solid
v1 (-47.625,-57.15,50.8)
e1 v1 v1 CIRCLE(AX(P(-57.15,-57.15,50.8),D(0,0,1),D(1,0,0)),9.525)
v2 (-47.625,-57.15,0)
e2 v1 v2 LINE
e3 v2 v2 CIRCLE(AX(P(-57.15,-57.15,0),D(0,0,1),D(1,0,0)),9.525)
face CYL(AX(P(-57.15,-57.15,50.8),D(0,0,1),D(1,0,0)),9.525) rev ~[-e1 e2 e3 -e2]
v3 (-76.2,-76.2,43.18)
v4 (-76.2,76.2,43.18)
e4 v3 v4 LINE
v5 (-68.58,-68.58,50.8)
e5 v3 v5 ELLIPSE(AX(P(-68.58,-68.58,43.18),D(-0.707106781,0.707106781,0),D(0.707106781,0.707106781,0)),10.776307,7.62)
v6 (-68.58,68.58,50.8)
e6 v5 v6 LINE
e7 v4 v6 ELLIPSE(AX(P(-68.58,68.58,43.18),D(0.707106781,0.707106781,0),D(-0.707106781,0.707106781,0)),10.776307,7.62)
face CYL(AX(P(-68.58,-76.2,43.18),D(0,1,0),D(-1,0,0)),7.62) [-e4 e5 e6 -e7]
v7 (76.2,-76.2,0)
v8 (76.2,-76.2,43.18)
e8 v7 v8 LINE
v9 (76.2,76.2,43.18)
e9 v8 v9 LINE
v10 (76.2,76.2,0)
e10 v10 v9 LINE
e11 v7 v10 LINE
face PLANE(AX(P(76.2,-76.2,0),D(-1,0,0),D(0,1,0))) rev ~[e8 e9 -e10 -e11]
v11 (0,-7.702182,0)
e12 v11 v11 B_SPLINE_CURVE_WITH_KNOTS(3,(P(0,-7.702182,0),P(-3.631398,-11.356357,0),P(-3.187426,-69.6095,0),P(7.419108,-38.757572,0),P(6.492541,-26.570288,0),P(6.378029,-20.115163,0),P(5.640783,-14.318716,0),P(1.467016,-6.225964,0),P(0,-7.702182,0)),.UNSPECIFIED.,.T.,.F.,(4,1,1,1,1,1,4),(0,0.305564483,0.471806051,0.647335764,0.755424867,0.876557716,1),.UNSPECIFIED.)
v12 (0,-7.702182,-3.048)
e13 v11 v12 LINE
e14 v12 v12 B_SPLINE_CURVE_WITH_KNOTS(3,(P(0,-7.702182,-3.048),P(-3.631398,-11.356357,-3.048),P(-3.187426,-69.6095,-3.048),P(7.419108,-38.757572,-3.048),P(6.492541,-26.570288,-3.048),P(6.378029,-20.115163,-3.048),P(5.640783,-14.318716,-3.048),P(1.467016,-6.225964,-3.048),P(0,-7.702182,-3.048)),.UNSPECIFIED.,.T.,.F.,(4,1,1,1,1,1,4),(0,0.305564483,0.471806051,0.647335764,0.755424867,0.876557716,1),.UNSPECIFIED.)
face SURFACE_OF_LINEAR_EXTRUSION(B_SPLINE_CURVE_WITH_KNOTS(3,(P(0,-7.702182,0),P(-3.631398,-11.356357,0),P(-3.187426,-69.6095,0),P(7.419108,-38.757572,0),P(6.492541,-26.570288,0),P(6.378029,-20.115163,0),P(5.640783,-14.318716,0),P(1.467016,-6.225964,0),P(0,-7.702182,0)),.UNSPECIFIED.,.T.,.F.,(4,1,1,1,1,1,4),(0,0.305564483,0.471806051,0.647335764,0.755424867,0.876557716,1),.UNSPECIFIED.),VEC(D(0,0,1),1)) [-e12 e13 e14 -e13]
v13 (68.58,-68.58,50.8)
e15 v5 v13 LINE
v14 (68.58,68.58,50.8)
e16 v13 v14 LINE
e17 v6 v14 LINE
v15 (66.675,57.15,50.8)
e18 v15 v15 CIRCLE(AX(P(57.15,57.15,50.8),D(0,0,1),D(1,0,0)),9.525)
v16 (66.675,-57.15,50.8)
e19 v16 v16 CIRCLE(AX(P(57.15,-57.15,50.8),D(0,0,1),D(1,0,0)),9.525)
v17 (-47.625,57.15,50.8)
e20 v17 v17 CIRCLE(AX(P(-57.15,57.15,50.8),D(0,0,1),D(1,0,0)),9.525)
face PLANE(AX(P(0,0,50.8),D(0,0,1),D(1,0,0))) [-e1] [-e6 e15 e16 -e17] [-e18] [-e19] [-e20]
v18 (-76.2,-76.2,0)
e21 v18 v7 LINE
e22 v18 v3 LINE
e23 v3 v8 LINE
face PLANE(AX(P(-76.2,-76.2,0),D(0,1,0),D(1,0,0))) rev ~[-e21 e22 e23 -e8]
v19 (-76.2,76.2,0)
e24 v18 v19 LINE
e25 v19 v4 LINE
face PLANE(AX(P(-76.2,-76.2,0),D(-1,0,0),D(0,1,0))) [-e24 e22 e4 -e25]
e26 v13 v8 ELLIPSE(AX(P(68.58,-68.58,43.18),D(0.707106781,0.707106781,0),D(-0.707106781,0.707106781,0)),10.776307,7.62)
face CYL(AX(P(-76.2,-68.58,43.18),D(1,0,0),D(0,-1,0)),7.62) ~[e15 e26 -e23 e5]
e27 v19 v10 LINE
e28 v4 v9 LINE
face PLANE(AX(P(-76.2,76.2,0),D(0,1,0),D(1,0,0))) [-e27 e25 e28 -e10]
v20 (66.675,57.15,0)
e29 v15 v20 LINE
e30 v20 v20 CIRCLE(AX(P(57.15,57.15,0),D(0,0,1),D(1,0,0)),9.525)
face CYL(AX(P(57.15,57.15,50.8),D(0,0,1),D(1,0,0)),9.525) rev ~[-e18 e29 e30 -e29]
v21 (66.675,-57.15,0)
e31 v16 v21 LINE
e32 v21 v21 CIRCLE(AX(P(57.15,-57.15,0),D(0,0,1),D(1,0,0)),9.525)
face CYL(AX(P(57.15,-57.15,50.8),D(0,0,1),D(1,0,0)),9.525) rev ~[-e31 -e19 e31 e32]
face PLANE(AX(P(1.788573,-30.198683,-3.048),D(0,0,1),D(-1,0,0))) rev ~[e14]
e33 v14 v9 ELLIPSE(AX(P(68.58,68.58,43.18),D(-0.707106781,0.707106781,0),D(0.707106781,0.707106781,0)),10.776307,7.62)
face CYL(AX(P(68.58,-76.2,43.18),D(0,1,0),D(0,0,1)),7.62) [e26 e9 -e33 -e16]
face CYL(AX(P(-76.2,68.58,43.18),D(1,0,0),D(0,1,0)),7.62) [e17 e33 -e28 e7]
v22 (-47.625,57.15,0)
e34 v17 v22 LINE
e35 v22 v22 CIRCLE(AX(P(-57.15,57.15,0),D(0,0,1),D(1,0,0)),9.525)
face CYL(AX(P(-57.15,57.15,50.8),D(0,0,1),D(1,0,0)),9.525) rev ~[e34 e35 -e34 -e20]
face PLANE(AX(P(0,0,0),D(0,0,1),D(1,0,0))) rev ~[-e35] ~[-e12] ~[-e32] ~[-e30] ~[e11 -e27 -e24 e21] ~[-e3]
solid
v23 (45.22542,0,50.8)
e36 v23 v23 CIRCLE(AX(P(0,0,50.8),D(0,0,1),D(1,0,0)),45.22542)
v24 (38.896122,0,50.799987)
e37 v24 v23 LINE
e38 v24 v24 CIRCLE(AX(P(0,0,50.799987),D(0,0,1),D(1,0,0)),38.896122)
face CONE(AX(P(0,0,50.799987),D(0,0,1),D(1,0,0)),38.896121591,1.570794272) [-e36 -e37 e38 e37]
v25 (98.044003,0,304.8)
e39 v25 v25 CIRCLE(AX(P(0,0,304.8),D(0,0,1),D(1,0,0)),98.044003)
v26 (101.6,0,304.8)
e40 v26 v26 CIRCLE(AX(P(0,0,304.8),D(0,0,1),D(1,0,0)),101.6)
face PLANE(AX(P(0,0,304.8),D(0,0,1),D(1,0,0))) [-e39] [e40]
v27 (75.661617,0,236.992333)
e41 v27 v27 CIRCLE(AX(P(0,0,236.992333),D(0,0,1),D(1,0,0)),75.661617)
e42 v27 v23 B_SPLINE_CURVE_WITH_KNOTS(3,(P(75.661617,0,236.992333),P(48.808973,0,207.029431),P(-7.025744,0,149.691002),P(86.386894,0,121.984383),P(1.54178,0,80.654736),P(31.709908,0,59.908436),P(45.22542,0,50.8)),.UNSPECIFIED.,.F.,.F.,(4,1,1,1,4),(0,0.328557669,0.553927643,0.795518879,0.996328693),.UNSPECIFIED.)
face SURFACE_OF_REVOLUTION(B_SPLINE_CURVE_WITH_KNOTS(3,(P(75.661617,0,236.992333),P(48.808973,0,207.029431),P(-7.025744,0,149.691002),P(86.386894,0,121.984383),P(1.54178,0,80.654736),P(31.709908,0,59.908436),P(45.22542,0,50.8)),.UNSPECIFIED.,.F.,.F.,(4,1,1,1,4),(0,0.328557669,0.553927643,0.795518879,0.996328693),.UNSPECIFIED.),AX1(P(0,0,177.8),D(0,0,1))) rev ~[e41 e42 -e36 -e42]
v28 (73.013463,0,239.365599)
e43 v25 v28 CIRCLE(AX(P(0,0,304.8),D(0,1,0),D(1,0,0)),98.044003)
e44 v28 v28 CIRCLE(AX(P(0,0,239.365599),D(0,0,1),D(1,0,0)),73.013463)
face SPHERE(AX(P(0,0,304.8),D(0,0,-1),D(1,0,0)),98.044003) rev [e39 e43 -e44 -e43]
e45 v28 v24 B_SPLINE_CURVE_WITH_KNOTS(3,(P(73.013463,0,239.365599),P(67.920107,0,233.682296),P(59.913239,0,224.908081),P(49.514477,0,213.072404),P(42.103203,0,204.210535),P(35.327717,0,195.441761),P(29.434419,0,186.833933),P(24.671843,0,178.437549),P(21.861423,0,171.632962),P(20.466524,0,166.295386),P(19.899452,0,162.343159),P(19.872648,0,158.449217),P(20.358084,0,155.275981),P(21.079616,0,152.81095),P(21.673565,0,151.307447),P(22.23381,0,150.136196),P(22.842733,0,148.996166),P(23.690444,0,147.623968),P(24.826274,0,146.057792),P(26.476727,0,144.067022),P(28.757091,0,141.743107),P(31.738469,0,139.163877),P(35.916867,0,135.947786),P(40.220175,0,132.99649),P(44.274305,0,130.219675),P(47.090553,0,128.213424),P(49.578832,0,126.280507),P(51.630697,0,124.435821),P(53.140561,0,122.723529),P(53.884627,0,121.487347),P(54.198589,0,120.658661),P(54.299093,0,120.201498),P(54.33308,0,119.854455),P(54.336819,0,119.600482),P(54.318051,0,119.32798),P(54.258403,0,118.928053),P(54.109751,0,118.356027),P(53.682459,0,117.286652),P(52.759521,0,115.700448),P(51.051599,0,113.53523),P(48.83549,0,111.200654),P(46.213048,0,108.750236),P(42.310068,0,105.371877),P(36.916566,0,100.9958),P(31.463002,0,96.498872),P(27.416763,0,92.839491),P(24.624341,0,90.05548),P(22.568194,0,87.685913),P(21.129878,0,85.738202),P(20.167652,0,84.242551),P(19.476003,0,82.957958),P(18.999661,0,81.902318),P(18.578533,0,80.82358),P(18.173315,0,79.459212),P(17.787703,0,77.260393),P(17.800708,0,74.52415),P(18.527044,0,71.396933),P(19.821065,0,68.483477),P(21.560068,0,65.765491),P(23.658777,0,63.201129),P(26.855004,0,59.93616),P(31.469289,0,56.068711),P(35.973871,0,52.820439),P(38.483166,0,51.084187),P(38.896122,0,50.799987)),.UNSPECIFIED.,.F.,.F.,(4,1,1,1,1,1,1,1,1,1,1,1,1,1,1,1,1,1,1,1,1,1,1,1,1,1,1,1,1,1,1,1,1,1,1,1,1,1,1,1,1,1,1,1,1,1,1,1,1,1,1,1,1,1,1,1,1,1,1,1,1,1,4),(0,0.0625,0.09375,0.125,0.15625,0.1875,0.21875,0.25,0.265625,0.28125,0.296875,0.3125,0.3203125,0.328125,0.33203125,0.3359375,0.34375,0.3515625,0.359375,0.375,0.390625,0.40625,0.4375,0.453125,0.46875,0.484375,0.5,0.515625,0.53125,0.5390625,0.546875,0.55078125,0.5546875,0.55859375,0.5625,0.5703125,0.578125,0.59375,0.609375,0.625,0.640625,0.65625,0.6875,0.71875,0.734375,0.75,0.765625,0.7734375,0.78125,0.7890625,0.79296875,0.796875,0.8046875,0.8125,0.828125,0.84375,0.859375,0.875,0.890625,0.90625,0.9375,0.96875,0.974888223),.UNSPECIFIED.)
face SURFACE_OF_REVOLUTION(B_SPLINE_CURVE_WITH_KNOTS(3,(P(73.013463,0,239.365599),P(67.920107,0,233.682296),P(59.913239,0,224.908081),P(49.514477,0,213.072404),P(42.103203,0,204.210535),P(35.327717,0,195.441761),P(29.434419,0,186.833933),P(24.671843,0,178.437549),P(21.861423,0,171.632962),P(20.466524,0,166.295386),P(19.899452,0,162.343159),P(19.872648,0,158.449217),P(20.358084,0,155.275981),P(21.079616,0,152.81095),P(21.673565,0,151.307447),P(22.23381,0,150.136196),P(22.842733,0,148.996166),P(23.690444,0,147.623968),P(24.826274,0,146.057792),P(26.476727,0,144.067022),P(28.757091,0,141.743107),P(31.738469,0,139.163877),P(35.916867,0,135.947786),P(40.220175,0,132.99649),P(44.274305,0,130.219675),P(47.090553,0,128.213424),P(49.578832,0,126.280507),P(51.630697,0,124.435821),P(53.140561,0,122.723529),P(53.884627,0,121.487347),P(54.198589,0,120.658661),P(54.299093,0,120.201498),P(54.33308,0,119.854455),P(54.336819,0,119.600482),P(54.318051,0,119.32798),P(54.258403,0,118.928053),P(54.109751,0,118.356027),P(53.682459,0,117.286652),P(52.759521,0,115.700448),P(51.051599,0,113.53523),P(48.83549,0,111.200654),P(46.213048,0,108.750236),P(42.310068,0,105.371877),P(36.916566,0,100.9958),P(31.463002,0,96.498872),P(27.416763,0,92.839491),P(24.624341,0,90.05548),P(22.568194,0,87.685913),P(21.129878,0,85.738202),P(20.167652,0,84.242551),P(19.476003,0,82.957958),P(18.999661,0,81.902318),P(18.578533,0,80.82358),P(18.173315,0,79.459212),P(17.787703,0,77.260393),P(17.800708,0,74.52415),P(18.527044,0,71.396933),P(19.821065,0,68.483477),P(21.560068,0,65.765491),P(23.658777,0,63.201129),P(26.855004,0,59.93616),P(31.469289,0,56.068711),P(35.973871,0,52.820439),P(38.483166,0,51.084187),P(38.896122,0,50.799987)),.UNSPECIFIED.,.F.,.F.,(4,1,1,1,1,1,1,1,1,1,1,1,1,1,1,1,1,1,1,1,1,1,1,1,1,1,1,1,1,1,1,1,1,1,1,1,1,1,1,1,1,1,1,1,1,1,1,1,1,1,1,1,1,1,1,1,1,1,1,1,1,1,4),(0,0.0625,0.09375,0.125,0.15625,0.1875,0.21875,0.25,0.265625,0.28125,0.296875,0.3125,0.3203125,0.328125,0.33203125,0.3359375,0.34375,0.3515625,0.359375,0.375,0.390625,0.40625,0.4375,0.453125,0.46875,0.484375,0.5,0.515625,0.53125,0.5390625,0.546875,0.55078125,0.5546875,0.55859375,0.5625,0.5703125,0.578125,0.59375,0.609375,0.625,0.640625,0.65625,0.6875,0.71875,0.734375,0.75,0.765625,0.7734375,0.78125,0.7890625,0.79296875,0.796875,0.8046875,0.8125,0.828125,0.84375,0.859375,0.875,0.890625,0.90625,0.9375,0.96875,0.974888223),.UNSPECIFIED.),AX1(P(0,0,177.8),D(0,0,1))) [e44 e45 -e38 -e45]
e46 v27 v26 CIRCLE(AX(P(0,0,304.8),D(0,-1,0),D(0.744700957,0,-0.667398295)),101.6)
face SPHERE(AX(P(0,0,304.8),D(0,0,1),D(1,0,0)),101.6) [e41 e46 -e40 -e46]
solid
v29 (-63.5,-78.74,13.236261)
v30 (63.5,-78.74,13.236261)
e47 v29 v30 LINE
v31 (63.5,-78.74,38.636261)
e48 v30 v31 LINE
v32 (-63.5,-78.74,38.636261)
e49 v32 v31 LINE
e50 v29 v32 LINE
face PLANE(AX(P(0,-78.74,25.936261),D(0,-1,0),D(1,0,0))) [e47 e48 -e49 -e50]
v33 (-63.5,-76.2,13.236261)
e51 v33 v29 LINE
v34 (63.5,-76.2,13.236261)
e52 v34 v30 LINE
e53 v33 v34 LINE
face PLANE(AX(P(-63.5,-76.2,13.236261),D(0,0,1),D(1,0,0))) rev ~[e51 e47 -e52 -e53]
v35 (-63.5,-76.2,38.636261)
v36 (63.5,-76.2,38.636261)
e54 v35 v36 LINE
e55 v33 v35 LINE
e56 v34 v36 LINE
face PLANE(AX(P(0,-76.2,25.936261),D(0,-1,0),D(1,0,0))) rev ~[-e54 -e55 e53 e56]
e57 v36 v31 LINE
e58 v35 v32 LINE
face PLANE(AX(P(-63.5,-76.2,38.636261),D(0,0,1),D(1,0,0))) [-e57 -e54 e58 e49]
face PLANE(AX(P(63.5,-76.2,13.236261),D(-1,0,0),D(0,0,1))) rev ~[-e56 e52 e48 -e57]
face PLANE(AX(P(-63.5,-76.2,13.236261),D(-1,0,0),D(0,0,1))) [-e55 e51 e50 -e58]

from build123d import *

# Parameters (mm, degrees)
F0_W      = 152.4
F0_H      = 152.4
F1_DEPTH  = 50.8
F2_W      = 127
F2_H      = 25.4
F3_DEPTH  = 2.54
F7_R      = 9.525
F8_DEPTH  = 110.236
F9_R      = 7.62
F11_DEPTH = 3.048


# Not quite as in the source:
# - ends of sketch curves that miss each other by under 0.0002 mm in the source are joined
# - the dataset's text gives a spline's control points without its knots; the knots are read off the source's solid


with BuildPart() as f1:
    # F0 (on Top) → F1 (new body)
    with BuildSketch(Plane.XY):
        Rectangle(F0_W, F0_H)
    extrude(amount=F1_DEPTH)

    # F7 (on face) → F8 (cut)
    with BuildSketch(Plane.XY.offset(50.8)):
        with Locations((-57.15, 57.15)):
            Circle(F7_R)
        with Locations((-57.15, -57.15)):
            Circle(F7_R)
        with Locations((57.15, 57.15)):
            Circle(F7_R)
        with Locations((57.15, -57.15)):
            Circle(F7_R)
    extrude(amount=-F8_DEPTH, mode=Mode.SUBTRACT)

    # F9
    f9_edges = [f1.edges().sort_by_distance(p)[0] for p in [
        (76.2, 0, 50.8),
        (0, -76.2, 50.8),
        (-76.2, 0, 50.8),
        (0, 76.2, 50.8),
    ]]
    fillet(f9_edges, radius=F9_R)

    # F10 (on face) → F11 (join)
    with BuildSketch(Plane(origin=(0, 0, 0), x_dir=(1, 0, 0), z_dir=(0, 0, -1))):
        with BuildLine():
            add(Edge.make_bspline(
                [(0, 7.7021815814), (-3.6313977016, 11.3563567366), (-3.1874263552, 69.6094998973), (7.4191084282, 38.7575716101), (6.4925414352, 26.570288192), (6.378028943, 20.1151630572), (5.6407833061, 14.3187155103), (1.4670161298, 6.2259637902), (0, 7.7021815814)],
                knots=[0, 0, 0, 0, 0.3055644832, 0.4718060515, 0.6473357636, 0.7554248666, 0.8765577162, 1, 1, 1, 1], degree=3))
        make_face()
    extrude(amount=F11_DEPTH)


with BuildPart() as f3:
    # F2 (on face) → F3 (new body)
    with BuildSketch(Plane.XZ.offset(76.2)):
        with Locations((0, 25.9362608194)):
            Rectangle(F2_W, F2_H)
    extrude(amount=F3_DEPTH)


with BuildPart() as f5:
    # F4 (on Front) → F5 (revolve)
    with BuildSketch(Plane.XZ):
        with BuildLine():
            add(Edge.make_bspline(
                [(75.661617229, 236.9923331894), (48.8089731412, 207.0294311443), (-7.0257436543, 149.6910017246), (86.3868939609, 121.984383041), (1.5417803268, 80.6547364845), (31.7099079405, 59.9084357565), (45.2254201298, 50.8)],
                knots=[0, 0, 0, 0, 0.3285576695, 0.5539276428, 0.7955188793, 0.9963286934, 0.9963286934, 0.9963286934, 0.9963286934], degree=3))
            ThreePointArc((75.661617229, 236.9923331894), (94.8940996861, 268.5002776214), (101.6, 304.8))
            Line((101.6, 304.8), (98.0440034793, 304.8))
            ThreePointArc((98.0440034793, 304.8), (91.5728094467, 269.7707666615), (73.013463217, 239.3655992057))
            add(Edge.make_bspline(
                [(73.013463217, 239.3655992057), (67.920107087, 233.6822955316), (59.9132388158, 224.9080810469), (49.5144766657, 213.0724037347), (42.1032033451, 204.2105349703), (35.3277167522, 195.4417614882), (29.4344187183, 186.8339328536), (24.6718429025, 178.4375490656), (21.861423182, 171.6329618437), (20.466524302, 166.2953857414), (19.8994522062, 162.3431593554), (19.8726484133, 158.4492168052), (20.3580838755, 155.2759809832), (21.0796156785, 152.8109495588), (21.6735647185, 151.3074471828), (22.2338100805, 150.1361963456), (22.842733407, 148.9961660864), (23.690444059, 147.6239675183), (24.8262738622, 146.0577918295), (26.4767272839, 144.0670223462), (28.7570911961, 141.7431065145), (31.7384693201, 139.1638771412), (35.9168668967, 135.9477858716), (40.2201747798, 132.9964903331), (44.2743051668, 130.2196745078), (47.0905525309, 128.213423825), (49.5788319814, 126.2805069174), (51.6306968123, 124.4358211831), (53.1405611374, 122.7235289983), (53.8846273606, 121.4873467256), (54.1985887401, 120.6586611694), (54.2990928501, 120.2014984584), (54.3330795674, 119.8544550371), (54.3368190338, 119.6004824772), (54.3180508606, 119.327979815), (54.2584026878, 118.9280529455), (54.1097510248, 118.3560271553), (53.682458921, 117.2866522567), (52.759520809, 115.7004483833), (51.0515992425, 113.5352300761), (48.8354897039, 111.200654216), (46.2130481373, 108.7502362484), (42.3100682686, 105.3718770838), (36.9165657046, 100.9958002819), (31.4630021414, 96.4988716584), (27.4167626018, 92.8394905445), (24.6243409961, 90.0554802307), (22.5681942263, 87.6859133637), (21.1298777686, 85.7382020612), (20.1676515107, 84.242551311), (19.4760032184, 82.957957537), (18.9996608274, 81.9023177267), (18.5785332228, 80.823579839), (18.1733147203, 79.4592117853), (17.7877032197, 77.2603933736), (17.8007080788, 74.5241503682), (18.5270440062, 71.3969331314), (19.8210652009, 68.483476961), (21.5600675308, 65.7654911851), (23.6587765867, 63.2011292819), (26.8550036618, 59.9361604346), (31.4692891324, 56.0687114488), (35.9738707918, 52.8204385731), (38.4831657072, 51.0841871883), (38.8961215908, 50.7999869925)],
                knots=[0, 0, 0, 0, 0.0625, 0.09375, 0.125, 0.15625, 0.1875, 0.21875, 0.25, 0.265625, 0.28125, 0.296875, 0.3125, 0.3203125, 0.328125, 0.33203125, 0.3359375, 0.34375, 0.3515625, 0.359375, 0.375, 0.390625, 0.40625, 0.4375, 0.453125, 0.46875, 0.484375, 0.5, 0.515625, 0.53125, 0.5390625, 0.546875, 0.55078125, 0.5546875, 0.55859375, 0.5625, 0.5703125, 0.578125, 0.59375, 0.609375, 0.625, 0.640625, 0.65625, 0.6875, 0.71875, 0.734375, 0.75, 0.765625, 0.7734375, 0.78125, 0.7890625, 0.79296875, 0.796875, 0.8046875, 0.8125, 0.828125, 0.84375, 0.859375, 0.875, 0.890625, 0.90625, 0.9375, 0.96875, 0.9748882231, 0.9748882231, 0.9748882231, 0.9748882231], degree=3))
            Line((38.8961215908, 50.7999869925), (45.2254201298, 50.8))
        make_face()
    revolve(axis=Axis((0, 0, 177.8), (0, 0, 1)))


solid = Compound([f1.part, f3.part, f5.part])
